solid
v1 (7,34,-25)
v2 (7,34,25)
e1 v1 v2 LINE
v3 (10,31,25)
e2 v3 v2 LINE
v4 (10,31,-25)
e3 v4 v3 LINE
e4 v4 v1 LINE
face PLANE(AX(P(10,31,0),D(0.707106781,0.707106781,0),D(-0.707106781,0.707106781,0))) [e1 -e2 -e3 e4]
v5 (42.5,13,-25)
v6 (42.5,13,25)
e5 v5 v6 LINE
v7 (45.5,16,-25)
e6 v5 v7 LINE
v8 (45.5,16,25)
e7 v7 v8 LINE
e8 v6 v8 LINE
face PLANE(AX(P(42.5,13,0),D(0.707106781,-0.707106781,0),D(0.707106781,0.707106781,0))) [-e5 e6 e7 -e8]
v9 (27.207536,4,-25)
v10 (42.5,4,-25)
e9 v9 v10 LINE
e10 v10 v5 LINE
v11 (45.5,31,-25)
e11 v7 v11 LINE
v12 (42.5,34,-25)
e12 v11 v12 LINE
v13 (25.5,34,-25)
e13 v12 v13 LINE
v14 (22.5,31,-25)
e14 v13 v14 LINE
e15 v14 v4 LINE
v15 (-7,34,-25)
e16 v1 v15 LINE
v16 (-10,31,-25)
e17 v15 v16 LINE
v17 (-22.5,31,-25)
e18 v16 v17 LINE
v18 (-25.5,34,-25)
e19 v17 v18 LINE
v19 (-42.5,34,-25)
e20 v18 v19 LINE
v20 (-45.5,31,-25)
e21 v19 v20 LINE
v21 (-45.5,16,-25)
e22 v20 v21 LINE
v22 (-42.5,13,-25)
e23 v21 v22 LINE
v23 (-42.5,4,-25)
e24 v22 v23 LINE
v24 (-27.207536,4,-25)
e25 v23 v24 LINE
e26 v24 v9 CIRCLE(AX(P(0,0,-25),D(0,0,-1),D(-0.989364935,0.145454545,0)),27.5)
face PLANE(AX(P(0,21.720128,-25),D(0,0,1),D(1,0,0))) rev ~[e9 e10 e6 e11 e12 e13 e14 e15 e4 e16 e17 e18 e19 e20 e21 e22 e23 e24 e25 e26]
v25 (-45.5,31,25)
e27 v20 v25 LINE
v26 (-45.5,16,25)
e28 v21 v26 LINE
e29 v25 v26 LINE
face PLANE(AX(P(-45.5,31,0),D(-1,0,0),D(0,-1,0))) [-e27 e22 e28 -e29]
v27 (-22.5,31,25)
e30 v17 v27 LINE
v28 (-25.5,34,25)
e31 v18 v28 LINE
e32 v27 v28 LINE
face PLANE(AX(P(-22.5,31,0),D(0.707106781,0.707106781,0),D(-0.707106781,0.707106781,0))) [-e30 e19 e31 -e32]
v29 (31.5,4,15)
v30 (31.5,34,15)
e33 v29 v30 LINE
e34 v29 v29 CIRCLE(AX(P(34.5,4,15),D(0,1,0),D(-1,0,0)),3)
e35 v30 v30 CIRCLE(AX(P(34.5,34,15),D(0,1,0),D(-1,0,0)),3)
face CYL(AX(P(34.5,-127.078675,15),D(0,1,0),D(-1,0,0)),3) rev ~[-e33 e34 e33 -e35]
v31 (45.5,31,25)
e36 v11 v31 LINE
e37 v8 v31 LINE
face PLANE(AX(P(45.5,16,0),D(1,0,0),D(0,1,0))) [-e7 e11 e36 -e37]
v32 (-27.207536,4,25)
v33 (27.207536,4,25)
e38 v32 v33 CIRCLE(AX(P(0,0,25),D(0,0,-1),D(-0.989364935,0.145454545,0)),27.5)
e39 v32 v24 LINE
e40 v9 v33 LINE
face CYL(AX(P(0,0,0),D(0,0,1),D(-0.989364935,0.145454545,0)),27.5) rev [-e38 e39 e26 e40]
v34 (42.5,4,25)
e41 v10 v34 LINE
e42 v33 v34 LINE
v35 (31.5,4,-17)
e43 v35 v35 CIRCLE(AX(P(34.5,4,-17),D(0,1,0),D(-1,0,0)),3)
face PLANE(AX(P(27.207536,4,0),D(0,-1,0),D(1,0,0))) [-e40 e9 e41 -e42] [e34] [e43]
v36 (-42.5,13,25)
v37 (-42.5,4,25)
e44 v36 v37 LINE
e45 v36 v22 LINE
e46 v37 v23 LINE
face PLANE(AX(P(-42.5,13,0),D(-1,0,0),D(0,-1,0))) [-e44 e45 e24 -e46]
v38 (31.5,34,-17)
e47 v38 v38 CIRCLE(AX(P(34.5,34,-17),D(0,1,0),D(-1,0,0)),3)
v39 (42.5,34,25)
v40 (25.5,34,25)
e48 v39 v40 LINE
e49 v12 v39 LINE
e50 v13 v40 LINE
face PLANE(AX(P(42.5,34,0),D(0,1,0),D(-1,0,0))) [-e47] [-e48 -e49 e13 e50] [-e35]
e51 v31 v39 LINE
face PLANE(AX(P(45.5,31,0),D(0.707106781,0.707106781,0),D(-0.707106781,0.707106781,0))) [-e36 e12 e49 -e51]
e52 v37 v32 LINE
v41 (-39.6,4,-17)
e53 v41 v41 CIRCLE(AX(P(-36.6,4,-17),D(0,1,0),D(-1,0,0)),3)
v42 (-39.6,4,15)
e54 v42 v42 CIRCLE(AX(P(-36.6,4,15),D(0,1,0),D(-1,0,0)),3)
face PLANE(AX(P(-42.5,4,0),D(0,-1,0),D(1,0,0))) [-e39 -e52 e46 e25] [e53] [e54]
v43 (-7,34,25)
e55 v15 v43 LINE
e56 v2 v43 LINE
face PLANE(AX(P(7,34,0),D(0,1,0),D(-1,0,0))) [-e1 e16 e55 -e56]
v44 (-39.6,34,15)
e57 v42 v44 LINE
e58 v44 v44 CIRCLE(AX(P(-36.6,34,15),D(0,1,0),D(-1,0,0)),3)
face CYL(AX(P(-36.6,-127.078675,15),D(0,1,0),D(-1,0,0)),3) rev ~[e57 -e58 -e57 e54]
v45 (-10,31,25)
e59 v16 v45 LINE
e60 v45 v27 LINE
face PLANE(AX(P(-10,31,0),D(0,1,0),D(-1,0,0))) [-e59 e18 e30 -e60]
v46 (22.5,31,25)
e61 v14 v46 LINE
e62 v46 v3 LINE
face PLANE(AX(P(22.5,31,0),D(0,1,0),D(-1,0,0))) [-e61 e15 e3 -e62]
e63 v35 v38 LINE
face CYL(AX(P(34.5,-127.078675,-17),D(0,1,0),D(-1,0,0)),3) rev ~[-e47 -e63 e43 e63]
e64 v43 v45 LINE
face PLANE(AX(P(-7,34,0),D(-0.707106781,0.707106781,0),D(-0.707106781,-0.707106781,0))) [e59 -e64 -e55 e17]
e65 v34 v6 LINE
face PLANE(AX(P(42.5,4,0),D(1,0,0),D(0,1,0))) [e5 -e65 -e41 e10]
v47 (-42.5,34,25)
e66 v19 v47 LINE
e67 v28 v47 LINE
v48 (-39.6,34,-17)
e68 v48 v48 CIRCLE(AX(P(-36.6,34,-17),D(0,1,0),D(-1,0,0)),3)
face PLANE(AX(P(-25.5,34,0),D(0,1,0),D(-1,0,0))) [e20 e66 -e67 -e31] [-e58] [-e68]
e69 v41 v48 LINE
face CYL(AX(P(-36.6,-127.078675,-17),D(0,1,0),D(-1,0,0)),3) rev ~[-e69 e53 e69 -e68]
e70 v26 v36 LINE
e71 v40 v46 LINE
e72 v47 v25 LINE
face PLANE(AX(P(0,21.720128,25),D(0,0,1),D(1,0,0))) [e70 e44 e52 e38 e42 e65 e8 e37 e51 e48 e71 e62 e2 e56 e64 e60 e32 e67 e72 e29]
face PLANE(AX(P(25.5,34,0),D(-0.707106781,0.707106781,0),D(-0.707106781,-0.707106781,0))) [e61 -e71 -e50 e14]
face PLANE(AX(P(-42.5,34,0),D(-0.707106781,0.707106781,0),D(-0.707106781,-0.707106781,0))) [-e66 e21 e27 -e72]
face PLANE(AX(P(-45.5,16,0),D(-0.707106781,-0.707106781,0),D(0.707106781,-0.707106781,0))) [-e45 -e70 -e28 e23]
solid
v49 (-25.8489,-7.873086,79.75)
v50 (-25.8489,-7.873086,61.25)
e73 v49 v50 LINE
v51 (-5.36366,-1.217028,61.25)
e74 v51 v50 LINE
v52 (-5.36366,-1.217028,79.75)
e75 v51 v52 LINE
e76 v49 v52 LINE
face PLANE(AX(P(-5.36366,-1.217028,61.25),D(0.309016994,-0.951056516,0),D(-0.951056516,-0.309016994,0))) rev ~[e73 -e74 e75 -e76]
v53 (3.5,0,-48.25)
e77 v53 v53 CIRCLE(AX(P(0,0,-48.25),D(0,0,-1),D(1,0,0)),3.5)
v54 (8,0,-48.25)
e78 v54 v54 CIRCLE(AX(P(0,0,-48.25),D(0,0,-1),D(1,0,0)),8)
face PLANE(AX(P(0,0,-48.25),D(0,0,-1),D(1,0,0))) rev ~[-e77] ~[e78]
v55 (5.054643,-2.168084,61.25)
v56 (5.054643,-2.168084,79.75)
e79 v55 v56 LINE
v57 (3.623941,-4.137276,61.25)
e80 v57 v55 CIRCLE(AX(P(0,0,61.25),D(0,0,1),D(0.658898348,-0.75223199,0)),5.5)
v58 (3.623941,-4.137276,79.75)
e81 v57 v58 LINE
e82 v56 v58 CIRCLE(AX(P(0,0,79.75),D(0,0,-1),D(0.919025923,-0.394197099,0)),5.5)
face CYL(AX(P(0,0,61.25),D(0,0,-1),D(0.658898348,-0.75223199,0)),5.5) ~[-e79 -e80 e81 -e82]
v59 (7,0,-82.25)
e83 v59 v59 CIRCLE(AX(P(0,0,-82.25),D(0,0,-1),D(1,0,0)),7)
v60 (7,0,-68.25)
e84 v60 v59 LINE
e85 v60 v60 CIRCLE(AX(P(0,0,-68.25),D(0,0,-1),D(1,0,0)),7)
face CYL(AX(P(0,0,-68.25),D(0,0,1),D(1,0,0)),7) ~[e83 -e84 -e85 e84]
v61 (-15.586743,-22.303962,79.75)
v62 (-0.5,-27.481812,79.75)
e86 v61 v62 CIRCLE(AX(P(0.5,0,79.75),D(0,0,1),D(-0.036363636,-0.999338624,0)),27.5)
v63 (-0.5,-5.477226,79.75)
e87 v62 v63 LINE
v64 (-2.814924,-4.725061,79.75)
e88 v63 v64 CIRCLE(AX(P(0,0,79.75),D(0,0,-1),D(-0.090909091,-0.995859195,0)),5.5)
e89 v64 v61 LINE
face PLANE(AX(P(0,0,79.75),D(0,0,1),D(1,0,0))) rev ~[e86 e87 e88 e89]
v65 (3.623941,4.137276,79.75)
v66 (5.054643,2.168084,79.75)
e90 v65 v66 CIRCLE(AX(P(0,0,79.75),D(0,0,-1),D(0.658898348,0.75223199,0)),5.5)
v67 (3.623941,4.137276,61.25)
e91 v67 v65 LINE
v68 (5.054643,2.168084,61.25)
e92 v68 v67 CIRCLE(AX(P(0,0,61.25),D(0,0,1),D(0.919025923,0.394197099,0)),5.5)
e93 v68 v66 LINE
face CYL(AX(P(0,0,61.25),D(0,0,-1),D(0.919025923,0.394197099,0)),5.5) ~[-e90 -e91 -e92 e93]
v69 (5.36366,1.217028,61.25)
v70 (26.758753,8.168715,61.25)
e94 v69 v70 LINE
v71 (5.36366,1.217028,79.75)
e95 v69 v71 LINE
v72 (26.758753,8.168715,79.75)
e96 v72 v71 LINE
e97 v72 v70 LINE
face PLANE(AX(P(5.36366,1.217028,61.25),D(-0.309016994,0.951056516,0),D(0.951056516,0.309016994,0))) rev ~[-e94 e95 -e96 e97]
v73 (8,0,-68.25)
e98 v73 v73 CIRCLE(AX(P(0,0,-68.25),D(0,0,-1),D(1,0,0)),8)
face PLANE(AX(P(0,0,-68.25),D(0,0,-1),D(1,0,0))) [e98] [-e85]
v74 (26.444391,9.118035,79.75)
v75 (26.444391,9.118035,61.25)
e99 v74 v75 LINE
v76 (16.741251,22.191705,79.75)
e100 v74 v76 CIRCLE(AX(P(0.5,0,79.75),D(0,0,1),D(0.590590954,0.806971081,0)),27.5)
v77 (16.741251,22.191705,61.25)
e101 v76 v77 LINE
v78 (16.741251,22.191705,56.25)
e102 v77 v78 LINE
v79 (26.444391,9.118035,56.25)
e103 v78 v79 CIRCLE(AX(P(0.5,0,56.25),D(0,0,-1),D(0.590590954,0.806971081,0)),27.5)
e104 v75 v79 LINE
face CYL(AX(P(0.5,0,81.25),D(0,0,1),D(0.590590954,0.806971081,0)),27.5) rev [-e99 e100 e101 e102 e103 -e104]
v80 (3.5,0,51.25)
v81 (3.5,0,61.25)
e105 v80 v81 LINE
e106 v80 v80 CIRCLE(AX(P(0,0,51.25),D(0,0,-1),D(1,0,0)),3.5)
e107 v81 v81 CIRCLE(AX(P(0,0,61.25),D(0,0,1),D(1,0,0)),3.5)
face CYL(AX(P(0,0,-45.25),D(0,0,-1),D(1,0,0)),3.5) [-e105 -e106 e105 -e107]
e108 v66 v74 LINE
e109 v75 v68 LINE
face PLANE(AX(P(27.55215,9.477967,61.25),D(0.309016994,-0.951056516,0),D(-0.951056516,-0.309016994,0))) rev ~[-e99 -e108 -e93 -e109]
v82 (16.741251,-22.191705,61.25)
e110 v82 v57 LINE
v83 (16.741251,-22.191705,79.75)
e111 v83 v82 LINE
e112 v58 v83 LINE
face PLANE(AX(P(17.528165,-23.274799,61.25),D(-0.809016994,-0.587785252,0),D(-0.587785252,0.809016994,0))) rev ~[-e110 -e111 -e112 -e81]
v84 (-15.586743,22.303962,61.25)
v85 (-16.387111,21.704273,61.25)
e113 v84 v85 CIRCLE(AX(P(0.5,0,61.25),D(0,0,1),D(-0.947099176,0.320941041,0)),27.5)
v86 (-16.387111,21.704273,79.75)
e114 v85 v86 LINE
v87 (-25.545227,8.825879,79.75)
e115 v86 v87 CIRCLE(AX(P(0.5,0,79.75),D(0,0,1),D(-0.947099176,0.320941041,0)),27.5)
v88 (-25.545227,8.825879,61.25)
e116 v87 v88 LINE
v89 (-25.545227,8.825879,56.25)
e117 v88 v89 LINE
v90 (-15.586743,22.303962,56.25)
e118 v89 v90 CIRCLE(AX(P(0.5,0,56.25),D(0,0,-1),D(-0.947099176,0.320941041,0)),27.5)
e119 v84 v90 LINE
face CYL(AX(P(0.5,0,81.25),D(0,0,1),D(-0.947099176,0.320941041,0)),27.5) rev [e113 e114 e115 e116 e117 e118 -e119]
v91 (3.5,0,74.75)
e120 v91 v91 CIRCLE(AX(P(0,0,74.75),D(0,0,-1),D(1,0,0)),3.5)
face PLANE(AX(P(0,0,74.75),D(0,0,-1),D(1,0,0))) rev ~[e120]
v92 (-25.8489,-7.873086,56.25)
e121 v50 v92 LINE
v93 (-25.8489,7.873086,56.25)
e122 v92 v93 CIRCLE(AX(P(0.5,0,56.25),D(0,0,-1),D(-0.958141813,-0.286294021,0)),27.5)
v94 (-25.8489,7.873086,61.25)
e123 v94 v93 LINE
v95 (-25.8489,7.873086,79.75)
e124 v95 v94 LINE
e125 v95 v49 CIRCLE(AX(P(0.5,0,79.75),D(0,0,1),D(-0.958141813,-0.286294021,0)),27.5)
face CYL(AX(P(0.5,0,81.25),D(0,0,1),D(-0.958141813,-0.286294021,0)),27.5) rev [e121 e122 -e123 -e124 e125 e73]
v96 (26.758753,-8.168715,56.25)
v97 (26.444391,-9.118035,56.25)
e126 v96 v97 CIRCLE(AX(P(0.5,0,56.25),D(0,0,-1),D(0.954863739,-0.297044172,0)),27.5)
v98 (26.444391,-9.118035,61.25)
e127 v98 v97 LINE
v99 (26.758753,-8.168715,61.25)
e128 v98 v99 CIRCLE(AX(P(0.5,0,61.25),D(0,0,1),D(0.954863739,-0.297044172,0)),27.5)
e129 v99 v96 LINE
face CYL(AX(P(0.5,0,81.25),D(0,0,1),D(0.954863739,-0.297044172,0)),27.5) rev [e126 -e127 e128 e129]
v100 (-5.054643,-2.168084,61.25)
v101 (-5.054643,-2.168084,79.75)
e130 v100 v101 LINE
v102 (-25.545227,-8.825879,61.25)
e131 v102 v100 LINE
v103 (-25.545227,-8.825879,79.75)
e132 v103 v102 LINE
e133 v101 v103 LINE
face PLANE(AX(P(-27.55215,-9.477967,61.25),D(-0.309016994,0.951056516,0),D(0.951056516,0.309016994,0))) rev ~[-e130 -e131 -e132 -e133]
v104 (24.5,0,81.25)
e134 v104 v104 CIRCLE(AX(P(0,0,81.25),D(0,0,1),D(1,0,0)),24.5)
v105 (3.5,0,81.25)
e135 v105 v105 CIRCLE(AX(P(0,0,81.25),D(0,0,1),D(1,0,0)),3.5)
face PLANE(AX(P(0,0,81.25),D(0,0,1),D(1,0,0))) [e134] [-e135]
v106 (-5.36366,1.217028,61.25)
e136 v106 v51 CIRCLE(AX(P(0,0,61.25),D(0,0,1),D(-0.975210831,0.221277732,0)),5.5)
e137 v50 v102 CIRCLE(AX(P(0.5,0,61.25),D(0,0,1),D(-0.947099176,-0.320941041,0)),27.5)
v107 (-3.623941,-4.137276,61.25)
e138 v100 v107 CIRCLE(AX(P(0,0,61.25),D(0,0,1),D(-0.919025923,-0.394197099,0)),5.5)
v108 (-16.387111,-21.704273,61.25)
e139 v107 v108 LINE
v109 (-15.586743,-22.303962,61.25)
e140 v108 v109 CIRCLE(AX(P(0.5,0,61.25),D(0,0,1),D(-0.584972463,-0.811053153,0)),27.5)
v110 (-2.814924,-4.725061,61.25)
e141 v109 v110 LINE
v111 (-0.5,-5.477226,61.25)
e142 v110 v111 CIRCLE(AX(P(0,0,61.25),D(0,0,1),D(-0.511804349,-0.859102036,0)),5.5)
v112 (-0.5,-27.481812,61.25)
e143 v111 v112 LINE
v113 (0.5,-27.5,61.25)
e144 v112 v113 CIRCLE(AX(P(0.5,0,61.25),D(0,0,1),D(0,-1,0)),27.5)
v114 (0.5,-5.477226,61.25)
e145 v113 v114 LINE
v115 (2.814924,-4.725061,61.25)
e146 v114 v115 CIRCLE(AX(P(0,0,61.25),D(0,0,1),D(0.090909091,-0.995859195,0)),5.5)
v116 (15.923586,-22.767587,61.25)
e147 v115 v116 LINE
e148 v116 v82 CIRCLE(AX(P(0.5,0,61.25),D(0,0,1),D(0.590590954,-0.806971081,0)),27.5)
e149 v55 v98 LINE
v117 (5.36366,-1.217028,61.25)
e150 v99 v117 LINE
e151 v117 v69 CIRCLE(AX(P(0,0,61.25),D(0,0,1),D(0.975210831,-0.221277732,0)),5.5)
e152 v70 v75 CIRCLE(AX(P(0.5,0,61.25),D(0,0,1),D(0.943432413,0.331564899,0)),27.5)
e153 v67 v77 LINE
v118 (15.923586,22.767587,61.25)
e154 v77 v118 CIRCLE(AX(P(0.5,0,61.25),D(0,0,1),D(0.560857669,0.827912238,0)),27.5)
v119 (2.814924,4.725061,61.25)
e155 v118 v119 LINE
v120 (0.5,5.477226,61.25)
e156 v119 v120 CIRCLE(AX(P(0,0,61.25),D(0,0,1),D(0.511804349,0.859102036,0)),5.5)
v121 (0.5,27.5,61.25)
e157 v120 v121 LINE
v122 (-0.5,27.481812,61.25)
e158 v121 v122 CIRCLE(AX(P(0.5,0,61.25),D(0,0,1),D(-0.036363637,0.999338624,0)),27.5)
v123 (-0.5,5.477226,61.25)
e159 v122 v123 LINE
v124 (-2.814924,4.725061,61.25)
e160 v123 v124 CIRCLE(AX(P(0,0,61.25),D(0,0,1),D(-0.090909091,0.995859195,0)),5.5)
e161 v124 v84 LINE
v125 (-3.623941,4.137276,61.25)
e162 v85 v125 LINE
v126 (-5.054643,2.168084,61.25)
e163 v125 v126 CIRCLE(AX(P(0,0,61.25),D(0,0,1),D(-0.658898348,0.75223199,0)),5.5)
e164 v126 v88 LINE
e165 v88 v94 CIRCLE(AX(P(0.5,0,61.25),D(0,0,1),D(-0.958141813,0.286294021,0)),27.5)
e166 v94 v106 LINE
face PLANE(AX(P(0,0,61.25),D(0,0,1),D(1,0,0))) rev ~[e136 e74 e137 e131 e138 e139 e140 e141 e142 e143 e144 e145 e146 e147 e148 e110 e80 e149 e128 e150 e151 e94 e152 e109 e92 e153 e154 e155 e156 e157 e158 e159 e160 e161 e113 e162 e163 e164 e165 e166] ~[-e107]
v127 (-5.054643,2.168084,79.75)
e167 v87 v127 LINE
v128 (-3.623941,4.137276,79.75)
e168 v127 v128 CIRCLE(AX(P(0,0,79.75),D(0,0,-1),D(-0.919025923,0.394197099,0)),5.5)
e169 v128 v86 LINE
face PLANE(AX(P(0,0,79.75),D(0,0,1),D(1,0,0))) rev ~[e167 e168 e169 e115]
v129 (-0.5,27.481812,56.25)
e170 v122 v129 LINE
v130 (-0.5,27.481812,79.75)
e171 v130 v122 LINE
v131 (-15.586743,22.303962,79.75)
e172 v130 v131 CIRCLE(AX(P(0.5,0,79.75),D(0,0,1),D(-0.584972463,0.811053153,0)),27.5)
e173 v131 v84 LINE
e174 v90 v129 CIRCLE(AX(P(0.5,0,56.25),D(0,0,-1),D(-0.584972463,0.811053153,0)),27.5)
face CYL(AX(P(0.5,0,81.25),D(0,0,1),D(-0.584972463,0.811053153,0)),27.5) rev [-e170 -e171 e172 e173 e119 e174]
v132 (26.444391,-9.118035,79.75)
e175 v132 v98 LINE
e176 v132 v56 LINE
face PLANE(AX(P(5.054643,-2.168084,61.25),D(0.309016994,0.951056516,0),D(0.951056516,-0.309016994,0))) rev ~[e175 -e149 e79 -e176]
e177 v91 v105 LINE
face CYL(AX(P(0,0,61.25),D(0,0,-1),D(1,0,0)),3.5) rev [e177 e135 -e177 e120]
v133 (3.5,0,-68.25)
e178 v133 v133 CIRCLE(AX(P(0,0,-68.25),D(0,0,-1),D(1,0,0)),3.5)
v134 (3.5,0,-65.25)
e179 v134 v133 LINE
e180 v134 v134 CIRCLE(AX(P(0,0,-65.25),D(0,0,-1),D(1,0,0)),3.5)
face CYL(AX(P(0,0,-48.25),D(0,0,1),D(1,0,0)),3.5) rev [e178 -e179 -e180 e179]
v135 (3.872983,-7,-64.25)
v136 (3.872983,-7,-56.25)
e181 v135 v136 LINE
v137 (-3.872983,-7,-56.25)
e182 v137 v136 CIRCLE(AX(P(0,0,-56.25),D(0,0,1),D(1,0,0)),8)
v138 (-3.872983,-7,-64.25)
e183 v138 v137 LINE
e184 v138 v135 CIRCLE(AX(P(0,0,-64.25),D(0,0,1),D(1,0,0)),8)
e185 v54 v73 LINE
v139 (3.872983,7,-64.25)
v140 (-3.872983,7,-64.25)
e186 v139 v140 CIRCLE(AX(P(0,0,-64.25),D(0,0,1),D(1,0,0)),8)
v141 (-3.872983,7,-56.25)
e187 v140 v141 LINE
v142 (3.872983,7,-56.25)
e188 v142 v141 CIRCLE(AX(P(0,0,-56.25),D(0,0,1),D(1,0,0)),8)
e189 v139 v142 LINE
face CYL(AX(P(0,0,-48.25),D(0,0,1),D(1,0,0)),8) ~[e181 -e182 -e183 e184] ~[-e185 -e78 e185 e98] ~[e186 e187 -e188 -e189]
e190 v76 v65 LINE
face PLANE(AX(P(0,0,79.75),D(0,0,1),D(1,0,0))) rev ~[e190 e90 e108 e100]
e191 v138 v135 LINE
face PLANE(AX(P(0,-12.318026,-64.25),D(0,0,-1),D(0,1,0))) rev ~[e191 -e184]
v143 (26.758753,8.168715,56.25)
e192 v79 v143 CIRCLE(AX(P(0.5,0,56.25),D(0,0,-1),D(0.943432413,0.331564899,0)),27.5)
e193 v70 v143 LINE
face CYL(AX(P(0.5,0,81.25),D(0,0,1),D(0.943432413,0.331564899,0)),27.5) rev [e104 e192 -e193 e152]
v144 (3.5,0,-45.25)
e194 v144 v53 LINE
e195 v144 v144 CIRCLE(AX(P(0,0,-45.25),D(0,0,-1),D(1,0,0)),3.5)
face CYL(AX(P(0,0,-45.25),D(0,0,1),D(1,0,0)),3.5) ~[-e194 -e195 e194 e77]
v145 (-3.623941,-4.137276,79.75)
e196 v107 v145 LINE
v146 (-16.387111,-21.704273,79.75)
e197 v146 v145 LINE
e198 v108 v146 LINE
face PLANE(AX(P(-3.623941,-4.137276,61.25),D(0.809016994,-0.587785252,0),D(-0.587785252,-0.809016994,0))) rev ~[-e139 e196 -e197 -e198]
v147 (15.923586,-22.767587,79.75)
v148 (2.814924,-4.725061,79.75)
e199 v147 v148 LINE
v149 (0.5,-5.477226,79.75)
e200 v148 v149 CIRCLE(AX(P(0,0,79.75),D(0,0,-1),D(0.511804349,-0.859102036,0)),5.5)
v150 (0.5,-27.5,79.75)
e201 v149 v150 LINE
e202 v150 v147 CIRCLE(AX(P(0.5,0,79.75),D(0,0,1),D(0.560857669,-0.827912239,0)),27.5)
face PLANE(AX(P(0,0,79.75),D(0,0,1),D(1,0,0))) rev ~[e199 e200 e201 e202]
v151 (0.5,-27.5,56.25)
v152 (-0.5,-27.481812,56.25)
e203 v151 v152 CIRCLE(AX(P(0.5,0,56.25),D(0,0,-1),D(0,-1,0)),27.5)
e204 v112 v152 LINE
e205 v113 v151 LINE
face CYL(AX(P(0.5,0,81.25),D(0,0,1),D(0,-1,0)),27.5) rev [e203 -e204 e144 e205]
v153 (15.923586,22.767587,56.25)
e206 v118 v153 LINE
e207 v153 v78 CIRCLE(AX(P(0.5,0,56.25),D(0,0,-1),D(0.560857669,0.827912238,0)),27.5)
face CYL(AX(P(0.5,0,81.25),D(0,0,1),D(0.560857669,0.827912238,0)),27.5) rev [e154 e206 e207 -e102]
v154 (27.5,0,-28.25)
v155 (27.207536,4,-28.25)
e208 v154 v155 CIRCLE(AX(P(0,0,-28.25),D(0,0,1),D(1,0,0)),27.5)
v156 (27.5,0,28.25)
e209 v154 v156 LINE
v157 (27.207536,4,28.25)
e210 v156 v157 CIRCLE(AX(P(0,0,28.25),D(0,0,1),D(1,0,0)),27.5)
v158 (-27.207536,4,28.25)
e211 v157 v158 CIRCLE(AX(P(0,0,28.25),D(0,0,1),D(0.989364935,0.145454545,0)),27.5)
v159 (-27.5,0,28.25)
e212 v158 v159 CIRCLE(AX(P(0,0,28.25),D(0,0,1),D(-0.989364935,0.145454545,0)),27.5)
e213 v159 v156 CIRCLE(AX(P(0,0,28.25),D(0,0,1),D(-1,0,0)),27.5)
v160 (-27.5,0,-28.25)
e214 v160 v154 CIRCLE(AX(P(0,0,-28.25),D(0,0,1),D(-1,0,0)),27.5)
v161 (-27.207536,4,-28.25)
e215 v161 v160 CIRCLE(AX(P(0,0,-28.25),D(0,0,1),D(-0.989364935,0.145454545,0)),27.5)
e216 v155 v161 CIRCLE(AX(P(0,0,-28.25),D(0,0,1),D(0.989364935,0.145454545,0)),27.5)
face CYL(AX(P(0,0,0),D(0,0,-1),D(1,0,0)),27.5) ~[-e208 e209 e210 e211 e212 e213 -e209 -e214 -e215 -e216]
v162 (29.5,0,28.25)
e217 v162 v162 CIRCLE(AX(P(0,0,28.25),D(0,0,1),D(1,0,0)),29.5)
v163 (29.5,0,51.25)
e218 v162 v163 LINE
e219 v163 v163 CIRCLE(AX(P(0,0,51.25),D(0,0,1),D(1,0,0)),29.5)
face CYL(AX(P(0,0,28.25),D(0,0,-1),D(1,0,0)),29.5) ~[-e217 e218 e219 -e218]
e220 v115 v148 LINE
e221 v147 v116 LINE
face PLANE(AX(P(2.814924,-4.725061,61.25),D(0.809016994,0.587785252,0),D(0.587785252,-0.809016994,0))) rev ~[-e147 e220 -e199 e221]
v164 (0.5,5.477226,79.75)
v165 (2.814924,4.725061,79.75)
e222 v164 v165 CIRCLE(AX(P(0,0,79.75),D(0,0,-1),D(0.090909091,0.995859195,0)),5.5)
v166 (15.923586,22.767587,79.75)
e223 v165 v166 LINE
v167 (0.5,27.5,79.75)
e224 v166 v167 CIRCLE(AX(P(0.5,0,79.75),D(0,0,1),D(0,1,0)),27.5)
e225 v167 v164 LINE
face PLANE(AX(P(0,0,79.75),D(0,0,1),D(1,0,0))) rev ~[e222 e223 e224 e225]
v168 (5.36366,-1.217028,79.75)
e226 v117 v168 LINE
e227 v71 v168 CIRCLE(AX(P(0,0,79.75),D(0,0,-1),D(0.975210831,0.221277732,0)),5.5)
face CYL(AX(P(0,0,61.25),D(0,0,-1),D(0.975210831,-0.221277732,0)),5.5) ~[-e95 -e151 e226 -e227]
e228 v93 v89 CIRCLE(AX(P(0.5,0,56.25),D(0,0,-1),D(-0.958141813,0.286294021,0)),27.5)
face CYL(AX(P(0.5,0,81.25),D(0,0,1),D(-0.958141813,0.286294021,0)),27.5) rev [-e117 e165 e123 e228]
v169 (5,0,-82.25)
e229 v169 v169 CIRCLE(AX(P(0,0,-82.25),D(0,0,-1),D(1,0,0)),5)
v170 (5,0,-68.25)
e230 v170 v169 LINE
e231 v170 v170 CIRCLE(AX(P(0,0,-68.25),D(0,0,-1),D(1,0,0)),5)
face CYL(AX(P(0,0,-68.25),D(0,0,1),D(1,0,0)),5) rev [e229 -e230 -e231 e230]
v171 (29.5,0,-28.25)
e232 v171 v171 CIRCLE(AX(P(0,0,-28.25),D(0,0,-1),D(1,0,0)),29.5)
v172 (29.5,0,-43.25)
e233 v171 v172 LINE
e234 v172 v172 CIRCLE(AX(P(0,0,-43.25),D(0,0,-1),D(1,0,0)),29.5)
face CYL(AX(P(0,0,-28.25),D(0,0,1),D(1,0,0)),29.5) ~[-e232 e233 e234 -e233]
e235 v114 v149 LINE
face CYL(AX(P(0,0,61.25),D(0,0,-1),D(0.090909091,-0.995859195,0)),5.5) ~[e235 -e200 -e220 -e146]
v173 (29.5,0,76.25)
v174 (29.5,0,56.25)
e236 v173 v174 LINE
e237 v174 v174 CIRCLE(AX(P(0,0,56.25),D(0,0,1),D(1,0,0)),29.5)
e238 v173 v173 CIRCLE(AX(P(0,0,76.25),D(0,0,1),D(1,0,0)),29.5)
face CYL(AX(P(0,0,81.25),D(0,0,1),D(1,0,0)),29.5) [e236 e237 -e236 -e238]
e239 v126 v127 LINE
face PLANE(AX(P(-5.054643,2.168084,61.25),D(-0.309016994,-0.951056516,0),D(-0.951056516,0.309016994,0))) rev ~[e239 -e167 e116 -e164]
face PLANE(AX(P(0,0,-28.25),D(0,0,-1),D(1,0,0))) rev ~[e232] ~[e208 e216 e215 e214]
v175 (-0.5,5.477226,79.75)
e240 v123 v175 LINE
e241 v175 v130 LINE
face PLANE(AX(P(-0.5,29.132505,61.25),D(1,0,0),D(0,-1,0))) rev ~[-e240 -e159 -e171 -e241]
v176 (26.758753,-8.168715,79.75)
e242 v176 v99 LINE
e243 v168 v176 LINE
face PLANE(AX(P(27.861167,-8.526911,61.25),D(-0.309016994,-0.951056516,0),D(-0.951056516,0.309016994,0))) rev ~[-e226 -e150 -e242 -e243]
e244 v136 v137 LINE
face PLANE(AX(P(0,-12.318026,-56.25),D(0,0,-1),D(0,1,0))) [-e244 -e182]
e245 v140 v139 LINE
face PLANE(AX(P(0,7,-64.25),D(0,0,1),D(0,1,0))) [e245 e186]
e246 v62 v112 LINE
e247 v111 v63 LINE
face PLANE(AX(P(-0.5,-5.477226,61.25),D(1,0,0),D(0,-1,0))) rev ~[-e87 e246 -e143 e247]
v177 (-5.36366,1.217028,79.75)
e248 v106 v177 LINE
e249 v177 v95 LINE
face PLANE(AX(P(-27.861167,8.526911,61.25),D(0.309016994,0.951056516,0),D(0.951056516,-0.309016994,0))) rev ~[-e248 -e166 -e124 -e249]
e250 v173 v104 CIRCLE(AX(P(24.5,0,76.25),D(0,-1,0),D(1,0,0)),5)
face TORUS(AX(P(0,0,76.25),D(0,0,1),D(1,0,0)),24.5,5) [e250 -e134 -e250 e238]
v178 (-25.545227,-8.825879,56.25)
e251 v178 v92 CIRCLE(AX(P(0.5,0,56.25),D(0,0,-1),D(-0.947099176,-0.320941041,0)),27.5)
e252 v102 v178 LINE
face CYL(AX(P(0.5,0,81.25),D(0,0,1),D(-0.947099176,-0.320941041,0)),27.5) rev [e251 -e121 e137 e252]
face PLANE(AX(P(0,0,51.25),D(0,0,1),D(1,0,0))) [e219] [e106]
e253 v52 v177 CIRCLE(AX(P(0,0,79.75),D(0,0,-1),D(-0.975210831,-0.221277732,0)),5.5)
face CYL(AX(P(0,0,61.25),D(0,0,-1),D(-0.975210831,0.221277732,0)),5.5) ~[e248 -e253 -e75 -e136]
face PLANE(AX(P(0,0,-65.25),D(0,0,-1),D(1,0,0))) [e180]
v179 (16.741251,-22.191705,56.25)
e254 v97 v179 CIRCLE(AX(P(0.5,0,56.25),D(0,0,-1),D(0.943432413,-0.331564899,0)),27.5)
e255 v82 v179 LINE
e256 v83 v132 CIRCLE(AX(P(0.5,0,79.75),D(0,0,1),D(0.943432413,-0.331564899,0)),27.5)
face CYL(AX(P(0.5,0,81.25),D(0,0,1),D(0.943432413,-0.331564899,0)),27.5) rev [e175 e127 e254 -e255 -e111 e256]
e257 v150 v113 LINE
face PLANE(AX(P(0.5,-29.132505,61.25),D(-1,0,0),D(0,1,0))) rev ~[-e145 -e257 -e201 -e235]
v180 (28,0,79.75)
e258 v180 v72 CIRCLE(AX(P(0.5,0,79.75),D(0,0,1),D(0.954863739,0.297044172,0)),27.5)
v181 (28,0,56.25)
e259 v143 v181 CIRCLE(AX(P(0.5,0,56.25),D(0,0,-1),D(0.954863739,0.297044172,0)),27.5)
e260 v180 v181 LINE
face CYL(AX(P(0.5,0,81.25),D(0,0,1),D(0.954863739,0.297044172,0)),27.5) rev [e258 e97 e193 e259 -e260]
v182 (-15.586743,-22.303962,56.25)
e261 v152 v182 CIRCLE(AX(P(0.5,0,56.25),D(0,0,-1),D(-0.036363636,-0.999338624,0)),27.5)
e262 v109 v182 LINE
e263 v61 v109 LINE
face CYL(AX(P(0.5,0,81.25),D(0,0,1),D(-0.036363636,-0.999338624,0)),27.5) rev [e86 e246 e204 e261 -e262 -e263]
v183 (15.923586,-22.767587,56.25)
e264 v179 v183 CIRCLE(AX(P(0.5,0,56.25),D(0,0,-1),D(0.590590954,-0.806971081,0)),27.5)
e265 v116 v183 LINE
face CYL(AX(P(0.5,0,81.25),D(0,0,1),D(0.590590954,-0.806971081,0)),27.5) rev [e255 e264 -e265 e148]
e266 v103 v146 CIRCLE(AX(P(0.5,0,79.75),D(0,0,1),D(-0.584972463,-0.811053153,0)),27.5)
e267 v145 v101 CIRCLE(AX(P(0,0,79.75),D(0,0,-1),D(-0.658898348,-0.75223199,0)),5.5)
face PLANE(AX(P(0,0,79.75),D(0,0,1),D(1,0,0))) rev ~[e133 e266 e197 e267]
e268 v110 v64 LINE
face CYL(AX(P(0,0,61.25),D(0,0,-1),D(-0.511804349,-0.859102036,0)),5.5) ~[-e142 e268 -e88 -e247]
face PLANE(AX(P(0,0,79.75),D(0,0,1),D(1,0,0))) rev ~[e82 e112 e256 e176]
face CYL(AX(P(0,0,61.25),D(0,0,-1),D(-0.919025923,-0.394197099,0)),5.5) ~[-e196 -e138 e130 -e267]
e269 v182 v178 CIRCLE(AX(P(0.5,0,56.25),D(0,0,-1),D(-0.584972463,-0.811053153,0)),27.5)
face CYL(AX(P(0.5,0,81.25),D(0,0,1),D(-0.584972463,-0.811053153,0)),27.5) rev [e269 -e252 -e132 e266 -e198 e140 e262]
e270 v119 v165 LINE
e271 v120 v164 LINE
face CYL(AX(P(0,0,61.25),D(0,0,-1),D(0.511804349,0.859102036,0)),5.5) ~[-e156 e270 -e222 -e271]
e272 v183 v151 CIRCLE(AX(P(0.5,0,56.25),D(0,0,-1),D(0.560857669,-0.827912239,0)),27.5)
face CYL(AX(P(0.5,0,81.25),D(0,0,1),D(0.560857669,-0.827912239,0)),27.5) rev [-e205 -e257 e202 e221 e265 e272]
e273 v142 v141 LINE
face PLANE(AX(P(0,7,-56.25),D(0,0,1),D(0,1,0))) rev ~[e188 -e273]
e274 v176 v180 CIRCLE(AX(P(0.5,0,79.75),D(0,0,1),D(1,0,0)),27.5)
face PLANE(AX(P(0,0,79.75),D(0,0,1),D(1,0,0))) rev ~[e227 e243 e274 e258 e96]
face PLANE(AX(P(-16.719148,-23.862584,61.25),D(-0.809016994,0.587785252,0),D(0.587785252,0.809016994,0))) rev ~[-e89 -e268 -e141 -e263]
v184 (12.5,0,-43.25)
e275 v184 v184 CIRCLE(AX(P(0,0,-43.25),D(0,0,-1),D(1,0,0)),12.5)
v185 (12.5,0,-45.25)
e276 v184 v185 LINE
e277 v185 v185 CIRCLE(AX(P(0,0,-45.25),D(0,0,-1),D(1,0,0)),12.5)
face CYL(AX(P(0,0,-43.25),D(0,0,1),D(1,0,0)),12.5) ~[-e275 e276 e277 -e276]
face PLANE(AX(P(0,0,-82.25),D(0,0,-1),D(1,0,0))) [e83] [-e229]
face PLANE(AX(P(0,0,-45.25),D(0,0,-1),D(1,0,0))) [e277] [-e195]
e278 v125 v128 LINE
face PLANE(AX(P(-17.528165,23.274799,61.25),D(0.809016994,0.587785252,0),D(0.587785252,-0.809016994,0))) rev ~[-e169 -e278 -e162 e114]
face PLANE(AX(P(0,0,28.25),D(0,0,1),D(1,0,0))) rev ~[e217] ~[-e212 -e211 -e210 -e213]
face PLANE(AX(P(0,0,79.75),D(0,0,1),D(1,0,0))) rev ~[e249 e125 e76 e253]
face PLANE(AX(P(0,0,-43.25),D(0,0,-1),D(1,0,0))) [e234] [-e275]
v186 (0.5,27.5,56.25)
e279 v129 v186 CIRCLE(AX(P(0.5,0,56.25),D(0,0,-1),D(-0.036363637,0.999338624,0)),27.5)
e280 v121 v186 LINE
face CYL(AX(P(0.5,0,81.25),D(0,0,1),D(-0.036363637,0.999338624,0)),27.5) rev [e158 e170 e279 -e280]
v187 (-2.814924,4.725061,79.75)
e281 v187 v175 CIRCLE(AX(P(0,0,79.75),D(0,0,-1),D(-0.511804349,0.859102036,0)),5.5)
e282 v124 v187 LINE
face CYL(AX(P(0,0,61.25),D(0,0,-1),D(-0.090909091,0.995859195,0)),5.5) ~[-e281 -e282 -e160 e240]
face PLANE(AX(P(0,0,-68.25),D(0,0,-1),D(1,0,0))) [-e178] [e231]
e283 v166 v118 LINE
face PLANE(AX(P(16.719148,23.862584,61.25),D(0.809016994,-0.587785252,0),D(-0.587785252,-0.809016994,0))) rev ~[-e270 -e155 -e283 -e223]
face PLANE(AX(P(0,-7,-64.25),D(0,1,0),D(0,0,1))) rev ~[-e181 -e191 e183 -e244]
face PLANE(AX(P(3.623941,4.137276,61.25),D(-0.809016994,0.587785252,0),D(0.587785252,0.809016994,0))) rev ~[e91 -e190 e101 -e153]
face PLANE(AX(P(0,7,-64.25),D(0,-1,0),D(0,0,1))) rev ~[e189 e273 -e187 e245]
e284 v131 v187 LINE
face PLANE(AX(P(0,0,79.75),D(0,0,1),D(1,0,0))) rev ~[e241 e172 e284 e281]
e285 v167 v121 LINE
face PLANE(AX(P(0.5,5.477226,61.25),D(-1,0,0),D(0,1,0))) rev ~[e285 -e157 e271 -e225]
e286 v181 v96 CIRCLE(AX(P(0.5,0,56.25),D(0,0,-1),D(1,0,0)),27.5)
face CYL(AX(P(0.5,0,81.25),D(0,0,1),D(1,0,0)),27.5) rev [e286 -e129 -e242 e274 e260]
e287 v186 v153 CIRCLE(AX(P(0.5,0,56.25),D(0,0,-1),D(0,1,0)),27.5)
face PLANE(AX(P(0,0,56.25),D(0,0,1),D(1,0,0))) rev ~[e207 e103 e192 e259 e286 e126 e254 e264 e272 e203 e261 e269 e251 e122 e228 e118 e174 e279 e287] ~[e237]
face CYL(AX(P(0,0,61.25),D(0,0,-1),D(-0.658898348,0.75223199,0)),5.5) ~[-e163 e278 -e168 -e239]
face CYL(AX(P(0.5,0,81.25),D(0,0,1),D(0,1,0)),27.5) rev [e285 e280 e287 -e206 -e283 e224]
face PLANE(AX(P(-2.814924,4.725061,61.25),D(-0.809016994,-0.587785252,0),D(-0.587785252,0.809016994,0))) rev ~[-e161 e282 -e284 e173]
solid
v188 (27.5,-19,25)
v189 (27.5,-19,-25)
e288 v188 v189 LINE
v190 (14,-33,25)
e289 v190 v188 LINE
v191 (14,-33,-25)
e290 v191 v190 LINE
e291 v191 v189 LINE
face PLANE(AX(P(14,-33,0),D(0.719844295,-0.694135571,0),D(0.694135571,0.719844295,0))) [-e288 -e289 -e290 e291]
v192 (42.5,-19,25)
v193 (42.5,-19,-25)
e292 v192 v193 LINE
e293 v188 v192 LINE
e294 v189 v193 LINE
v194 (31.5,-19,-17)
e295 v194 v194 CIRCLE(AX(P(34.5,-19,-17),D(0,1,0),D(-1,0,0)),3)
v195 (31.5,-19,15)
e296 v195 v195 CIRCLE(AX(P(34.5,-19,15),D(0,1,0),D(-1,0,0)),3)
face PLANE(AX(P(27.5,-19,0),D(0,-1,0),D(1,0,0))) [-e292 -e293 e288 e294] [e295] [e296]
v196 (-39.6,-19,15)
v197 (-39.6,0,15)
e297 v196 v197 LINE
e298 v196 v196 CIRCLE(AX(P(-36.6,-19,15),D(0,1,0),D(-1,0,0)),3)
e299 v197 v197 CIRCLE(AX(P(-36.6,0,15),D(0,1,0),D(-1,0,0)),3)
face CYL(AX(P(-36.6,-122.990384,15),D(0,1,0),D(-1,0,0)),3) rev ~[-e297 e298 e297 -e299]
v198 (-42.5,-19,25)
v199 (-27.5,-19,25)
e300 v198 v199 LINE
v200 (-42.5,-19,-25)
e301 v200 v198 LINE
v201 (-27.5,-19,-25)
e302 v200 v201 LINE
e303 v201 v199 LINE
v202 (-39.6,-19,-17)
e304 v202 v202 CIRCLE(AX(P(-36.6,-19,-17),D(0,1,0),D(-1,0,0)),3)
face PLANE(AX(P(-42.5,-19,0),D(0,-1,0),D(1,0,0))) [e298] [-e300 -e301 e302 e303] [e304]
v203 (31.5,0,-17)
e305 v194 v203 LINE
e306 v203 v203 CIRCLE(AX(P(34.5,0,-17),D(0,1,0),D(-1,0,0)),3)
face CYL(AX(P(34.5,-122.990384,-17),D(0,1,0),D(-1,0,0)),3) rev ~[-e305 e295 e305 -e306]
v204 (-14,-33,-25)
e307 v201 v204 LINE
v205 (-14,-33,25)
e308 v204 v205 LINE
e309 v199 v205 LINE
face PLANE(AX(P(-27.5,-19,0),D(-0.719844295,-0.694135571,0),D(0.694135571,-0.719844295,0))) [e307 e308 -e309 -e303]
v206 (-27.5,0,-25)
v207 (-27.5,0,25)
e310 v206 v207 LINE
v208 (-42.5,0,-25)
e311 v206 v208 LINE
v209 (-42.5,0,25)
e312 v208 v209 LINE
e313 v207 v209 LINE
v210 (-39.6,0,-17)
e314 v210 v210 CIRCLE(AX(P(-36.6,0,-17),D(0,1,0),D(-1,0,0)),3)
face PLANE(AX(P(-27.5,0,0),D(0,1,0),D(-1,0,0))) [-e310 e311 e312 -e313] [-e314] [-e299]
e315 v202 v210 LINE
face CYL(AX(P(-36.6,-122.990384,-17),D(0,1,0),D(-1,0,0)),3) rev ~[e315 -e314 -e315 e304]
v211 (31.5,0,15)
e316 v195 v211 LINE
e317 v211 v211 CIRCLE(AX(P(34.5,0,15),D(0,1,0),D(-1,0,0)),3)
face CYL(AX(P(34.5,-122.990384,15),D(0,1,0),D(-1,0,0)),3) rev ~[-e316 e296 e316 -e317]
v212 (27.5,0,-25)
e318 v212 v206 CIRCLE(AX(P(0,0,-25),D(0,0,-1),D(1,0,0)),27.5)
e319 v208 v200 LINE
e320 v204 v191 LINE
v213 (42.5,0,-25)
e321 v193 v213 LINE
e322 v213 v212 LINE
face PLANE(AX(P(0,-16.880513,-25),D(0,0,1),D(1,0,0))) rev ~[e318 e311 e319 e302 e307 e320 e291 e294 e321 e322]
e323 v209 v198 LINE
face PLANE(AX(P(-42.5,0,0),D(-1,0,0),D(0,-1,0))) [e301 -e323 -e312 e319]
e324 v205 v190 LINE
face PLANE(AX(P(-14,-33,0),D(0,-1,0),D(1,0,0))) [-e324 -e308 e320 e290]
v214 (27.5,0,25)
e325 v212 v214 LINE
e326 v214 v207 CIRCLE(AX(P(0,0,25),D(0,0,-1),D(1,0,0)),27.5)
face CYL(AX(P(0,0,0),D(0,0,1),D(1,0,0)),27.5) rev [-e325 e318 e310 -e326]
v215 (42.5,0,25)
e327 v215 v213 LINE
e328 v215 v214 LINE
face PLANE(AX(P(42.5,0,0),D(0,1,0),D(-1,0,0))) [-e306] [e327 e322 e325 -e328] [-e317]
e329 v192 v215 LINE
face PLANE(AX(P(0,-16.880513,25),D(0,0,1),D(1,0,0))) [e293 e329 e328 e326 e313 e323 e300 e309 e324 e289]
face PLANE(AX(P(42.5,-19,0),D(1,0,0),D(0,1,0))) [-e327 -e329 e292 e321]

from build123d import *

# Parameters (mm, degrees)
F1_DEPTH      = 28.25
F2_R          = 29.5
F3_DEPTH      = 23
F4_R          = 29.5
F5_DEPTH      = 15
F6_R          = 12.5
F7_DEPTH      = 2
F8_R          = 3.5
F9_DEPTH      = 20
F9_DEPTH_BACK = 120
F11_R         = 8
F11_R_2       = 3.5
F12_DEPTH     = 20
F13_W         = 5.3180262744
F13_H         = 8
F14_DEPTH     = 5
F15_R         = 7
F15_R_2       = 5
F16_DEPTH     = 14
F18_R         = 3.5
F19_DEPTH     = 20
F20_R         = 29.5
F21_DEPTH     = 1.5
F22_R         = 29.5
F23_DEPTH     = 25
F24_R         = 5
F25_DEPTH     = 25
F27_D         = 6
F27_2_D       = 6


with BuildPart() as f1:
    # F0 (on Top) → F1 (new body, symmetric)
    with BuildSketch(Plane.XY):
        with BuildLine():
            ThreePointArc((-27.5, 0), (0, -27.5), (27.5, 0))
            ThreePointArc((27.5, 0), (27.4267864716, 2.0053388339), (27.2075357208, 4))
            ThreePointArc((27.2075357208, 4), (0, 27.5), (-27.2075357208, 4))
            ThreePointArc((-27.2075357208, 4), (-27.4267864716, 2.0053388339), (-27.5, 0))
        make_face()
    extrude(amount=F1_DEPTH, both=True)

    # F2 (on face) → F3 (join)
    with BuildSketch(Plane.XY.offset(28.25)):
        Circle(F2_R)
        with BuildLine():
            ThreePointArc((-27.5, 0), (-27.4267864716, 2.0053388339), (-27.2075357208, 4))
            ThreePointArc((-27.2075357208, 4), (0, 27.5), (27.2075357208, 4))
            ThreePointArc((27.2075357208, 4), (27.4267864716, 2.0053388339), (27.5, 0))
            ThreePointArc((27.5, 0), (0, -27.5), (-27.5, 0))
        make_face(mode=Mode.SUBTRACT)
        with BuildLine():
            ThreePointArc((27.2075357208, 4), (0, 27.5), (-27.2075357208, 4))
            ThreePointArc((-27.2075357208, 4), (-27.4267864716, 2.0053388339), (-27.5, 0))
            ThreePointArc((-27.5, 0), (0, -27.5), (27.5, 0))
            ThreePointArc((27.5, 0), (27.4267864716, 2.0053388339), (27.2075357208, 4))
        make_face()
    extrude(amount=F3_DEPTH)

    # F4 (on face) → F5 (join)
    with BuildSketch(Plane(origin=(0, 0, -28.25), x_dir=(1, 0, 0), z_dir=(0, 0, -1))):
        Circle(F4_R)
        with BuildLine():
            ThreePointArc((-27.2075357208, -4), (-27.4267864716, -2.0053388339), (-27.5, 0))
            ThreePointArc((-27.5, 0), (0, 27.5), (27.5, 0))
            ThreePointArc((27.5, 0), (27.4267864716, -2.0053388339), (27.2075357208, -4))
            ThreePointArc((27.2075357208, -4), (0, -27.5), (-27.2075357208, -4))
        make_face(mode=Mode.SUBTRACT)
        with BuildLine():
            ThreePointArc((27.5, 0), (0, 27.5), (-27.5, 0))
            ThreePointArc((-27.5, 0), (-27.4267864716, -2.0053388339), (-27.2075357208, -4))
            ThreePointArc((-27.2075357208, -4), (0, -27.5), (27.2075357208, -4))
            ThreePointArc((27.2075357208, -4), (27.4267864716, -2.0053388339), (27.5, 0))
        make_face()
    extrude(amount=F5_DEPTH)

    # F6 (on face) → F7 (join)
    with BuildSketch(Plane(origin=(0, 0, -43.25), x_dir=(1, 0, 0), z_dir=(0, 0, -1))):
        Circle(F6_R)
    extrude(amount=F7_DEPTH)

    # F8 (on face) → F9 (join, two sides)
    with BuildSketch(Plane(origin=(0, 0, -45.25), x_dir=(1, 0, 0), z_dir=(0, 0, -1))) as f9_sk:
        Circle(F8_R)
    extrude(amount=F9_DEPTH)
    extrude(f9_sk.sketch, amount=-F9_DEPTH_BACK)

    # F11 (on offset) → F12 (join)
    with BuildSketch(Plane(origin=(0, 0, -48.25), x_dir=(1, 0, 0), z_dir=(0, 0, -1))):
        Circle(F11_R)
        Circle(F11_R_2, mode=Mode.SUBTRACT)
    extrude(amount=F12_DEPTH)

    # F13 (on Right) → F14 (cut, symmetric)
    with BuildSketch(Plane.YZ):
        with Locations((9.6590131372, -60.25)):
            Rectangle(F13_W, F13_H)
        with Locations((-9.6590131372, -60.25)):
            Rectangle(F13_W, F13_H)
    extrude(amount=F14_DEPTH, both=True, mode=Mode.SUBTRACT)

    # F15 (on face) → F16 (join)
    with BuildSketch(Plane(origin=(0, 0, -68.25), x_dir=(1, 0, 0), z_dir=(0, 0, -1))):
        Circle(F15_R)
        Circle(F15_R_2, mode=Mode.SUBTRACT)
    extrude(amount=F16_DEPTH)

    # F18 (on offset) → F19 (join)
    with BuildSketch(Plane.XY.offset(61.25)):
        with BuildLine():
            Line((-0.5, -5.4772255751), (-0.5, -29.1325048873))
            Line((-0.5, -29.1325048873), (0.5, -29.1325048873))
            Line((0.5, -29.1325048873), (0.5, -5.4772255751))
            ThreePointArc((0.5, -5.4772255751), (1.6995934691, -5.2308108396), (2.8149239193, -4.7250611984))
            Line((2.8149239193, -4.7250611984), (16.7191482379, -23.8625841687))
            Line((16.7191482379, -23.8625841687), (17.5281652323, -23.2747989164))
            Line((17.5281652323, -23.2747989164), (3.6239409137, -4.1372759461))
            ThreePointArc((3.6239409137, -4.1372759461), (4.4495934691, -3.2328188876), (5.0546425772, -2.1680840429))
            Line((5.0546425772, -2.1680840429), (27.5521501119, -9.477967357))
            Line((27.5521501119, -9.477967357), (27.8611671063, -8.5269108407))
            Line((27.8611671063, -8.5269108407), (5.3636595716, -1.2170275266))
            ThreePointArc((5.3636595716, -1.2170275266), (5.5, 0), (5.3636595716, 1.2170275266))
            Line((5.3636595716, 1.2170275266), (27.8611671063, 8.5269108407))
            Line((27.8611671063, 8.5269108407), (27.5521501119, 9.477967357))
            Line((27.5521501119, 9.477967357), (5.0546425772, 2.1680840429))
            ThreePointArc((5.0546425772, 2.1680840429), (4.4495934691, 3.2328188876), (3.6239409137, 4.1372759461))
            Line((3.6239409137, 4.1372759461), (17.5281652323, 23.2747989164))
            Line((17.5281652323, 23.2747989164), (16.7191482379, 23.8625841687))
            Line((16.7191482379, 23.8625841687), (2.8149239193, 4.7250611984))
            ThreePointArc((2.8149239193, 4.7250611984), (1.6995934691, 5.2308108396), (0.5, 5.4772255751))
            Line((0.5, 5.4772255751), (0.5, 29.1325048873))
            Line((0.5, 29.1325048873), (-0.5, 29.1325048873))
            Line((-0.5, 29.1325048873), (-0.5, 5.4772255751))
            ThreePointArc((-0.5, 5.4772255751), (-1.6995934691, 5.2308108396), (-2.8149239193, 4.7250611984))
            Line((-2.8149239193, 4.7250611984), (-16.7191482379, 23.8625841687))
            Line((-16.7191482379, 23.8625841687), (-17.5281652323, 23.2747989164))
            Line((-17.5281652323, 23.2747989164), (-3.6239409137, 4.1372759461))
            ThreePointArc((-3.6239409137, 4.1372759461), (-4.4495934691, 3.2328188876), (-5.0546425772, 2.1680840429))
            Line((-5.0546425772, 2.1680840429), (-27.5521501119, 9.477967357))
            Line((-27.5521501119, 9.477967357), (-27.8611671063, 8.5269108407))
            Line((-27.8611671063, 8.5269108407), (-5.3636595716, 1.2170275266))
            ThreePointArc((-5.3636595716, 1.2170275266), (-5.5, 0), (-5.3636595716, -1.2170275266))
            Line((-5.3636595716, -1.2170275266), (-27.8611671063, -8.5269108407))
            Line((-27.8611671063, -8.5269108407), (-27.5521501119, -9.477967357))
            Line((-27.5521501119, -9.477967357), (-5.0546425772, -2.1680840429))
            ThreePointArc((-5.0546425772, -2.1680840429), (-4.4495934691, -3.2328188876), (-3.6239409137, -4.1372759461))
            Line((-3.6239409137, -4.1372759461), (-17.5281652323, -23.2747989164))
            Line((-17.5281652323, -23.2747989164), (-16.7191482379, -23.8625841687))
            Line((-16.7191482379, -23.8625841687), (-2.8149239193, -4.7250611984))
            ThreePointArc((-2.8149239193, -4.7250611984), (-1.6995934691, -5.2308108396), (-0.5, -5.4772255751))
        make_face()
        Circle(F18_R, mode=Mode.SUBTRACT)
    extrude(amount=F19_DEPTH)

    # F20 (on face) → F21 (join)
    with BuildSketch(Plane.XY.offset(81.25)):
        Circle(F20_R)
        with BuildLine():
            ThreePointArc((-0.5, -5.4772255751), (-1.6995934691, -5.2308108396), (-2.8149239193, -4.7250611984))
            Line((-2.8149239193, -4.7250611984), (-16.7191482379, -23.8625841687))
            Line((-16.7191482379, -23.8625841687), (-17.5281652323, -23.2747989164))
            Line((-17.5281652323, -23.2747989164), (-3.6239409137, -4.1372759461))
            ThreePointArc((-3.6239409137, -4.1372759461), (-4.4495934691, -3.2328188876), (-5.0546425772, -2.1680840429))
            Line((-5.0546425772, -2.1680840429), (-27.5521501119, -9.477967357))
            Line((-27.5521501119, -9.477967357), (-27.8611671063, -8.5269108407))
            Line((-27.8611671063, -8.5269108407), (-5.3636595716, -1.2170275266))
            ThreePointArc((-5.3636595716, -1.2170275266), (-5.5, 0), (-5.3636595716, 1.2170275266))
            Line((-5.3636595716, 1.2170275266), (-27.8611671063, 8.5269108407))
            Line((-27.8611671063, 8.5269108407), (-27.5521501119, 9.477967357))
            Line((-27.5521501119, 9.477967357), (-5.0546425772, 2.1680840429))
            ThreePointArc((-5.0546425772, 2.1680840429), (-4.4495934691, 3.2328188876), (-3.6239409137, 4.1372759461))
            Line((-3.6239409137, 4.1372759461), (-17.5281652323, 23.2747989164))
            Line((-17.5281652323, 23.2747989164), (-16.7191482379, 23.8625841687))
            Line((-16.7191482379, 23.8625841687), (-2.8149239193, 4.7250611984))
            ThreePointArc((-2.8149239193, 4.7250611984), (-1.6995934691, 5.2308108396), (-0.5, 5.4772255751))
            Line((-0.5, 5.4772255751), (-0.5, 29.1325048873))
            Line((-0.5, 29.1325048873), (0.5, 29.1325048873))
            Line((0.5, 29.1325048873), (0.5, 5.4772255751))
            ThreePointArc((0.5, 5.4772255751), (1.6995934691, 5.2308108396), (2.8149239193, 4.7250611984))
            Line((2.8149239193, 4.7250611984), (16.7191482379, 23.8625841687))
            Line((16.7191482379, 23.8625841687), (17.5281652323, 23.2747989164))
            Line((17.5281652323, 23.2747989164), (3.6239409137, 4.1372759461))
            ThreePointArc((3.6239409137, 4.1372759461), (4.4495934691, 3.2328188876), (5.0546425772, 2.1680840429))
            Line((5.0546425772, 2.1680840429), (27.5521501119, 9.477967357))
            Line((27.5521501119, 9.477967357), (27.8611671063, 8.5269108407))
            Line((27.8611671063, 8.5269108407), (5.3636595716, 1.2170275266))
            ThreePointArc((5.3636595716, 1.2170275266), (5.5, 0), (5.3636595716, -1.2170275266))
            Line((5.3636595716, -1.2170275266), (27.8611671063, -8.5269108407))
            Line((27.8611671063, -8.5269108407), (27.5521501119, -9.477967357))
            Line((27.5521501119, -9.477967357), (5.0546425772, -2.1680840429))
            ThreePointArc((5.0546425772, -2.1680840429), (4.4495934691, -3.2328188876), (3.6239409137, -4.1372759461))
            Line((3.6239409137, -4.1372759461), (17.5281652323, -23.2747989164))
            Line((17.5281652323, -23.2747989164), (16.7191482379, -23.8625841687))
            Line((16.7191482379, -23.8625841687), (2.8149239193, -4.7250611984))
            ThreePointArc((2.8149239193, -4.7250611984), (1.6995934691, -5.2308108396), (0.5, -5.4772255751))
            Line((0.5, -5.4772255751), (0.5, -29.1325048873))
            Line((0.5, -29.1325048873), (-0.5, -29.1325048873))
            Line((-0.5, -29.1325048873), (-0.5, -5.4772255751))
        make_face(mode=Mode.SUBTRACT)
    extrude(amount=-F21_DEPTH)

    # F22 (on face) → F23 (join)
    with BuildSketch(Plane.XY.offset(81.25)):
        Circle(F22_R)
        with BuildLine():
            ThreePointArc((26.7587528212, 8.1687147261), (27.6879173769, 4.1312405775), (28, 0))
            ThreePointArc((28, 0), (27.6879173769, -4.1312405775), (26.7587528212, -8.1687147261))
            Line((26.7587528212, -8.1687147261), (27.8611671063, -8.5269108407))
            Line((27.8611671063, -8.5269108407), (27.5521501119, -9.477967357))
            Line((27.5521501119, -9.477967357), (26.4443913566, -9.1180347188))
            ThreePointArc((26.4443913566, -9.1180347188), (22.5825116788, -16.3894074926), (16.7412512355, -22.1917047183))
            Line((16.7412512355, -22.1917047183), (17.5281652323, -23.2747989164))
            Line((17.5281652323, -23.2747989164), (16.7191482379, -23.8625841687))
            Line((16.7191482379, -23.8625841687), (15.9235859071, -22.76758656))
            ThreePointArc((15.9235859071, -22.76758656), (8.5666402424, -26.2902893708), (0.5, -27.5))
            Line((0.5, -27.5), (0.5, -29.1325048873))
            Line((0.5, -29.1325048873), (-0.5, -29.1325048873))
            Line((-0.5, -29.1325048873), (-0.5, -27.4818121673))
            ThreePointArc((-0.5, -27.4818121673), (-8.4270223583, -26.0107337808), (-15.5867427383, -22.3039617124))
            Line((-15.5867427383, -22.3039617124), (-16.7191482379, -23.8625841687))
            Line((-16.7191482379, -23.8625841687), (-17.5281652323, -23.2747989164))
            Line((-17.5281652323, -23.2747989164), (-16.3871113987, -21.7042730495))
            ThreePointArc((-16.3871113987, -21.7042730495), (-21.9111509737, -15.9370735091), (-25.5452273296, -8.8258786163))
            Line((-25.5452273296, -8.8258786163), (-27.5521501119, -9.477967357))
            Line((-27.5521501119, -9.477967357), (-27.8611671063, -8.5269108407))
            Line((-27.8611671063, -8.5269108407), (-25.8488998538, -7.8730855763))
            ThreePointArc((-25.8488998538, -7.8730855763), (-27, 0), (-25.8488998538, 7.8730855763))
            Line((-25.8488998538, 7.8730855763), (-27.8611671063, 8.5269108407))
            Line((-27.8611671063, 8.5269108407), (-27.5521501119, 9.477967357))
            Line((-27.5521501119, 9.477967357), (-25.5452273296, 8.8258786163))
            ThreePointArc((-25.5452273296, 8.8258786163), (-21.9111509737, 15.9370735091), (-16.3871113987, 21.7042730495))
            Line((-16.3871113987, 21.7042730495), (-17.5281652323, 23.2747989164))
            Line((-17.5281652323, 23.2747989164), (-16.7191482379, 23.8625841687))
            Line((-16.7191482379, 23.8625841687), (-15.5867427383, 22.3039617124))
            ThreePointArc((-15.5867427383, 22.3039617124), (-8.4270223583, 26.0107337808), (-0.5, 27.4818121673))
            Line((-0.5, 27.4818121673), (-0.5, 29.1325048873))
            Line((-0.5, 29.1325048873), (0.5, 29.1325048873))
            Line((0.5, 29.1325048873), (0.5, 27.5))
            ThreePointArc((0.5, 27.5), (8.5666402424, 26.2902893708), (15.9235859071, 22.76758656))
            Line((15.9235859071, 22.76758656), (16.7191482379, 23.8625841687))
            Line((16.7191482379, 23.8625841687), (17.5281652323, 23.2747989164))
            Line((17.5281652323, 23.2747989164), (16.7412512355, 22.1917047183))
            ThreePointArc((16.7412512355, 22.1917047183), (22.5825116788, 16.3894074926), (26.4443913566, 9.1180347188))
            Line((26.4443913566, 9.1180347188), (27.5521501119, 9.477967357))
            Line((27.5521501119, 9.477967357), (27.8611671063, 8.5269108407))
            Line((27.8611671063, 8.5269108407), (26.7587528212, 8.1687147261))
        make_face(mode=Mode.SUBTRACT)
        with BuildLine():
            ThreePointArc((-25.8488998538, 7.8730855763), (-25.7013948956, 8.3508625619), (-25.5452273296, 8.8258786163))
            Line((-25.5452273296, 8.8258786163), (-27.5521501119, 9.477967357))
            Line((-27.5521501119, 9.477967357), (-27.8611671063, 8.5269108407))
            Line((-27.8611671063, 8.5269108407), (-25.8488998538, 7.8730855763))
        make_face()
        with BuildLine():
            Line((-27.5521501119, -9.477967357), (-25.5452273296, -8.8258786163))
            ThreePointArc((-25.5452273296, -8.8258786163), (-25.7013948956, -8.3508625619), (-25.8488998538, -7.8730855763))
            Line((-25.8488998538, -7.8730855763), (-27.8611671063, -8.5269108407))
            Line((-27.8611671063, -8.5269108407), (-27.5521501119, -9.477967357))
        make_face()
        with BuildLine():
            ThreePointArc((-16.3871113987, 21.7042730495), (-15.9896534465, 22.0077561149), (-15.5867427383, 22.3039617124))
            Line((-15.5867427383, 22.3039617124), (-16.7191482379, 23.8625841687))
            Line((-16.7191482379, 23.8625841687), (-17.5281652323, 23.2747989164))
            Line((-17.5281652323, 23.2747989164), (-16.3871113987, 21.7042730495))
        make_face()
        with BuildLine():
            Line((-16.7191482379, -23.8625841687), (-15.5867427383, -22.3039617124))
            ThreePointArc((-15.5867427383, -22.3039617124), (-15.9896534465, -22.0077561149), (-16.3871113987, -21.7042730495))
            Line((-16.3871113987, -21.7042730495), (-17.5281652323, -23.2747989164))
            Line((-17.5281652323, -23.2747989164), (-16.7191482379, -23.8625841687))
        make_face()
        with BuildLine():
            ThreePointArc((-0.5, 27.4818121673), (-8.26925e-05, 27.4954526659), (0.5, 27.5))
            Line((0.5, 27.5), (0.5, 29.1325048873))
            Line((0.5, 29.1325048873), (-0.5, 29.1325048873))
            Line((-0.5, 29.1325048873), (-0.5, 27.4818121673))
        make_face()
        with BuildLine():
            Line((0.5, -29.1325048873), (0.5, -27.5))
            ThreePointArc((0.5, -27.5), (-8.26925e-05, -27.4954526659), (-0.5, -27.4818121673))
            Line((-0.5, -27.4818121673), (-0.5, -29.1325048873))
            Line((-0.5, -29.1325048873), (0.5, -29.1325048873))
        make_face()
        with BuildLine():
            ThreePointArc((15.9235859071, 22.76758656), (16.3350367158, 22.4833630093), (16.7412512355, 22.1917047183))
            Line((16.7412512355, 22.1917047183), (17.5281652323, 23.2747989164))
            Line((17.5281652323, 23.2747989164), (16.7191482379, 23.8625841687))
            Line((16.7191482379, 23.8625841687), (15.9235859071, 22.76758656))
        make_face()
        with BuildLine():
            Line((17.5281652323, -23.2747989164), (16.7412512355, -22.1917047183))
            ThreePointArc((16.7412512355, -22.1917047183), (16.3350367158, -22.4833630093), (15.9235859071, -22.76758656))
            Line((15.9235859071, -22.76758656), (16.7191482379, -23.8625841687))
            Line((16.7191482379, -23.8625841687), (17.5281652323, -23.2747989164))
        make_face()
        with BuildLine():
            ThreePointArc((26.4443913566, 9.1180347188), (26.6058876046, 8.6448037789), (26.7587528212, 8.1687147261))
            Line((26.7587528212, 8.1687147261), (27.8611671063, 8.5269108407))
            Line((27.8611671063, 8.5269108407), (27.5521501119, 9.477967357))
            Line((27.5521501119, 9.477967357), (26.4443913566, 9.1180347188))
        make_face()
        with BuildLine():
            Line((27.8611671063, -8.5269108407), (26.7587528212, -8.1687147261))
            ThreePointArc((26.7587528212, -8.1687147261), (26.6058876046, -8.6448037789), (26.4443913566, -9.1180347188))
            Line((26.4443913566, -9.1180347188), (27.5521501119, -9.477967357))
            Line((27.5521501119, -9.477967357), (27.8611671063, -8.5269108407))
        make_face()
    extrude(amount=-F23_DEPTH)

    # F24
    f24_edges = [f1.edges().sort_by_distance(p)[0] for p in [
        (-29.5, 0, 81.25),
    ]]
    fillet(f24_edges, radius=F24_R)


with BuildPart() as f25:
    # F0 (on Top) → F25 (new body, symmetric)
    with BuildSketch(Plane.XY):
        with BuildLine():
            Line((42.5, 0), (27.5, 0))
            ThreePointArc((27.5, 0), (0, -27.5), (-27.5, 0))
            Line((-27.5, 0), (-42.5, 0))
            Line((-42.5, 0), (-42.5, -19))
            Line((-42.5, -19), (-27.5, -19))
            Line((-27.5, -19), (-14, -33))
            Line((-14, -33), (0, -33))
            Line((0, -33), (14, -33))
            Line((14, -33), (27.5, -19))
            Line((27.5, -19), (42.5, -19))
            Line((42.5, -19), (42.5, 0))
        make_face()
    extrude(amount=F25_DEPTH, both=True)

    # F27 (through all)
    with Locations(Plane.XZ.offset(19)):
        with Locations((-36.6, 15), (-36.6, -17), (34.5, 15), (34.5, -17)):
            Hole(F27_D / 2)


with BuildPart() as f25b:
    # F0 (on Top) → F25, piece 2 (new body, symmetric)
    with BuildSketch(Plane.XY):
        with BuildLine():
            ThreePointArc((-27.2075357208, 4), (0, 27.5), (27.2075357208, 4))
            Line((27.2075357208, 4), (42.5, 4))
            Line((42.5, 4), (42.5, 13))
            Line((42.5, 13), (45.5, 16))
            Line((45.5, 16), (45.5, 31))
            Line((45.5, 31), (42.5, 34))
            Line((42.5, 34), (25.5, 34))
            Line((25.5, 34), (22.5, 31))
            Line((22.5, 31), (10, 31))
            Line((10, 31), (7, 34))
            Line((7, 34), (0, 34))
            Line((0, 34), (-7, 34))
            Line((-7, 34), (-10, 31))
            Line((-10, 31), (-22.5, 31))
            Line((-22.5, 31), (-25.5, 34))
            Line((-25.5, 34), (-42.5, 34))
            Line((-42.5, 34), (-45.5, 31))
            Line((-45.5, 31), (-45.5, 16))
            Line((-45.5, 16), (-42.5, 13))
            Line((-42.5, 13), (-42.5, 4))
            Line((-42.5, 4), (-27.2075357208, 4))
        make_face()
    extrude(amount=F25_DEPTH, both=True)

    # F27#2 (through all)
    with Locations(Plane.XZ.offset(19)):
        with Locations((-36.6, 15), (-36.6, -17), (34.5, 15), (34.5, -17)):
            Hole(F27_2_D / 2)


solid = Compound([f1.part, f25.part, f25b.part])
